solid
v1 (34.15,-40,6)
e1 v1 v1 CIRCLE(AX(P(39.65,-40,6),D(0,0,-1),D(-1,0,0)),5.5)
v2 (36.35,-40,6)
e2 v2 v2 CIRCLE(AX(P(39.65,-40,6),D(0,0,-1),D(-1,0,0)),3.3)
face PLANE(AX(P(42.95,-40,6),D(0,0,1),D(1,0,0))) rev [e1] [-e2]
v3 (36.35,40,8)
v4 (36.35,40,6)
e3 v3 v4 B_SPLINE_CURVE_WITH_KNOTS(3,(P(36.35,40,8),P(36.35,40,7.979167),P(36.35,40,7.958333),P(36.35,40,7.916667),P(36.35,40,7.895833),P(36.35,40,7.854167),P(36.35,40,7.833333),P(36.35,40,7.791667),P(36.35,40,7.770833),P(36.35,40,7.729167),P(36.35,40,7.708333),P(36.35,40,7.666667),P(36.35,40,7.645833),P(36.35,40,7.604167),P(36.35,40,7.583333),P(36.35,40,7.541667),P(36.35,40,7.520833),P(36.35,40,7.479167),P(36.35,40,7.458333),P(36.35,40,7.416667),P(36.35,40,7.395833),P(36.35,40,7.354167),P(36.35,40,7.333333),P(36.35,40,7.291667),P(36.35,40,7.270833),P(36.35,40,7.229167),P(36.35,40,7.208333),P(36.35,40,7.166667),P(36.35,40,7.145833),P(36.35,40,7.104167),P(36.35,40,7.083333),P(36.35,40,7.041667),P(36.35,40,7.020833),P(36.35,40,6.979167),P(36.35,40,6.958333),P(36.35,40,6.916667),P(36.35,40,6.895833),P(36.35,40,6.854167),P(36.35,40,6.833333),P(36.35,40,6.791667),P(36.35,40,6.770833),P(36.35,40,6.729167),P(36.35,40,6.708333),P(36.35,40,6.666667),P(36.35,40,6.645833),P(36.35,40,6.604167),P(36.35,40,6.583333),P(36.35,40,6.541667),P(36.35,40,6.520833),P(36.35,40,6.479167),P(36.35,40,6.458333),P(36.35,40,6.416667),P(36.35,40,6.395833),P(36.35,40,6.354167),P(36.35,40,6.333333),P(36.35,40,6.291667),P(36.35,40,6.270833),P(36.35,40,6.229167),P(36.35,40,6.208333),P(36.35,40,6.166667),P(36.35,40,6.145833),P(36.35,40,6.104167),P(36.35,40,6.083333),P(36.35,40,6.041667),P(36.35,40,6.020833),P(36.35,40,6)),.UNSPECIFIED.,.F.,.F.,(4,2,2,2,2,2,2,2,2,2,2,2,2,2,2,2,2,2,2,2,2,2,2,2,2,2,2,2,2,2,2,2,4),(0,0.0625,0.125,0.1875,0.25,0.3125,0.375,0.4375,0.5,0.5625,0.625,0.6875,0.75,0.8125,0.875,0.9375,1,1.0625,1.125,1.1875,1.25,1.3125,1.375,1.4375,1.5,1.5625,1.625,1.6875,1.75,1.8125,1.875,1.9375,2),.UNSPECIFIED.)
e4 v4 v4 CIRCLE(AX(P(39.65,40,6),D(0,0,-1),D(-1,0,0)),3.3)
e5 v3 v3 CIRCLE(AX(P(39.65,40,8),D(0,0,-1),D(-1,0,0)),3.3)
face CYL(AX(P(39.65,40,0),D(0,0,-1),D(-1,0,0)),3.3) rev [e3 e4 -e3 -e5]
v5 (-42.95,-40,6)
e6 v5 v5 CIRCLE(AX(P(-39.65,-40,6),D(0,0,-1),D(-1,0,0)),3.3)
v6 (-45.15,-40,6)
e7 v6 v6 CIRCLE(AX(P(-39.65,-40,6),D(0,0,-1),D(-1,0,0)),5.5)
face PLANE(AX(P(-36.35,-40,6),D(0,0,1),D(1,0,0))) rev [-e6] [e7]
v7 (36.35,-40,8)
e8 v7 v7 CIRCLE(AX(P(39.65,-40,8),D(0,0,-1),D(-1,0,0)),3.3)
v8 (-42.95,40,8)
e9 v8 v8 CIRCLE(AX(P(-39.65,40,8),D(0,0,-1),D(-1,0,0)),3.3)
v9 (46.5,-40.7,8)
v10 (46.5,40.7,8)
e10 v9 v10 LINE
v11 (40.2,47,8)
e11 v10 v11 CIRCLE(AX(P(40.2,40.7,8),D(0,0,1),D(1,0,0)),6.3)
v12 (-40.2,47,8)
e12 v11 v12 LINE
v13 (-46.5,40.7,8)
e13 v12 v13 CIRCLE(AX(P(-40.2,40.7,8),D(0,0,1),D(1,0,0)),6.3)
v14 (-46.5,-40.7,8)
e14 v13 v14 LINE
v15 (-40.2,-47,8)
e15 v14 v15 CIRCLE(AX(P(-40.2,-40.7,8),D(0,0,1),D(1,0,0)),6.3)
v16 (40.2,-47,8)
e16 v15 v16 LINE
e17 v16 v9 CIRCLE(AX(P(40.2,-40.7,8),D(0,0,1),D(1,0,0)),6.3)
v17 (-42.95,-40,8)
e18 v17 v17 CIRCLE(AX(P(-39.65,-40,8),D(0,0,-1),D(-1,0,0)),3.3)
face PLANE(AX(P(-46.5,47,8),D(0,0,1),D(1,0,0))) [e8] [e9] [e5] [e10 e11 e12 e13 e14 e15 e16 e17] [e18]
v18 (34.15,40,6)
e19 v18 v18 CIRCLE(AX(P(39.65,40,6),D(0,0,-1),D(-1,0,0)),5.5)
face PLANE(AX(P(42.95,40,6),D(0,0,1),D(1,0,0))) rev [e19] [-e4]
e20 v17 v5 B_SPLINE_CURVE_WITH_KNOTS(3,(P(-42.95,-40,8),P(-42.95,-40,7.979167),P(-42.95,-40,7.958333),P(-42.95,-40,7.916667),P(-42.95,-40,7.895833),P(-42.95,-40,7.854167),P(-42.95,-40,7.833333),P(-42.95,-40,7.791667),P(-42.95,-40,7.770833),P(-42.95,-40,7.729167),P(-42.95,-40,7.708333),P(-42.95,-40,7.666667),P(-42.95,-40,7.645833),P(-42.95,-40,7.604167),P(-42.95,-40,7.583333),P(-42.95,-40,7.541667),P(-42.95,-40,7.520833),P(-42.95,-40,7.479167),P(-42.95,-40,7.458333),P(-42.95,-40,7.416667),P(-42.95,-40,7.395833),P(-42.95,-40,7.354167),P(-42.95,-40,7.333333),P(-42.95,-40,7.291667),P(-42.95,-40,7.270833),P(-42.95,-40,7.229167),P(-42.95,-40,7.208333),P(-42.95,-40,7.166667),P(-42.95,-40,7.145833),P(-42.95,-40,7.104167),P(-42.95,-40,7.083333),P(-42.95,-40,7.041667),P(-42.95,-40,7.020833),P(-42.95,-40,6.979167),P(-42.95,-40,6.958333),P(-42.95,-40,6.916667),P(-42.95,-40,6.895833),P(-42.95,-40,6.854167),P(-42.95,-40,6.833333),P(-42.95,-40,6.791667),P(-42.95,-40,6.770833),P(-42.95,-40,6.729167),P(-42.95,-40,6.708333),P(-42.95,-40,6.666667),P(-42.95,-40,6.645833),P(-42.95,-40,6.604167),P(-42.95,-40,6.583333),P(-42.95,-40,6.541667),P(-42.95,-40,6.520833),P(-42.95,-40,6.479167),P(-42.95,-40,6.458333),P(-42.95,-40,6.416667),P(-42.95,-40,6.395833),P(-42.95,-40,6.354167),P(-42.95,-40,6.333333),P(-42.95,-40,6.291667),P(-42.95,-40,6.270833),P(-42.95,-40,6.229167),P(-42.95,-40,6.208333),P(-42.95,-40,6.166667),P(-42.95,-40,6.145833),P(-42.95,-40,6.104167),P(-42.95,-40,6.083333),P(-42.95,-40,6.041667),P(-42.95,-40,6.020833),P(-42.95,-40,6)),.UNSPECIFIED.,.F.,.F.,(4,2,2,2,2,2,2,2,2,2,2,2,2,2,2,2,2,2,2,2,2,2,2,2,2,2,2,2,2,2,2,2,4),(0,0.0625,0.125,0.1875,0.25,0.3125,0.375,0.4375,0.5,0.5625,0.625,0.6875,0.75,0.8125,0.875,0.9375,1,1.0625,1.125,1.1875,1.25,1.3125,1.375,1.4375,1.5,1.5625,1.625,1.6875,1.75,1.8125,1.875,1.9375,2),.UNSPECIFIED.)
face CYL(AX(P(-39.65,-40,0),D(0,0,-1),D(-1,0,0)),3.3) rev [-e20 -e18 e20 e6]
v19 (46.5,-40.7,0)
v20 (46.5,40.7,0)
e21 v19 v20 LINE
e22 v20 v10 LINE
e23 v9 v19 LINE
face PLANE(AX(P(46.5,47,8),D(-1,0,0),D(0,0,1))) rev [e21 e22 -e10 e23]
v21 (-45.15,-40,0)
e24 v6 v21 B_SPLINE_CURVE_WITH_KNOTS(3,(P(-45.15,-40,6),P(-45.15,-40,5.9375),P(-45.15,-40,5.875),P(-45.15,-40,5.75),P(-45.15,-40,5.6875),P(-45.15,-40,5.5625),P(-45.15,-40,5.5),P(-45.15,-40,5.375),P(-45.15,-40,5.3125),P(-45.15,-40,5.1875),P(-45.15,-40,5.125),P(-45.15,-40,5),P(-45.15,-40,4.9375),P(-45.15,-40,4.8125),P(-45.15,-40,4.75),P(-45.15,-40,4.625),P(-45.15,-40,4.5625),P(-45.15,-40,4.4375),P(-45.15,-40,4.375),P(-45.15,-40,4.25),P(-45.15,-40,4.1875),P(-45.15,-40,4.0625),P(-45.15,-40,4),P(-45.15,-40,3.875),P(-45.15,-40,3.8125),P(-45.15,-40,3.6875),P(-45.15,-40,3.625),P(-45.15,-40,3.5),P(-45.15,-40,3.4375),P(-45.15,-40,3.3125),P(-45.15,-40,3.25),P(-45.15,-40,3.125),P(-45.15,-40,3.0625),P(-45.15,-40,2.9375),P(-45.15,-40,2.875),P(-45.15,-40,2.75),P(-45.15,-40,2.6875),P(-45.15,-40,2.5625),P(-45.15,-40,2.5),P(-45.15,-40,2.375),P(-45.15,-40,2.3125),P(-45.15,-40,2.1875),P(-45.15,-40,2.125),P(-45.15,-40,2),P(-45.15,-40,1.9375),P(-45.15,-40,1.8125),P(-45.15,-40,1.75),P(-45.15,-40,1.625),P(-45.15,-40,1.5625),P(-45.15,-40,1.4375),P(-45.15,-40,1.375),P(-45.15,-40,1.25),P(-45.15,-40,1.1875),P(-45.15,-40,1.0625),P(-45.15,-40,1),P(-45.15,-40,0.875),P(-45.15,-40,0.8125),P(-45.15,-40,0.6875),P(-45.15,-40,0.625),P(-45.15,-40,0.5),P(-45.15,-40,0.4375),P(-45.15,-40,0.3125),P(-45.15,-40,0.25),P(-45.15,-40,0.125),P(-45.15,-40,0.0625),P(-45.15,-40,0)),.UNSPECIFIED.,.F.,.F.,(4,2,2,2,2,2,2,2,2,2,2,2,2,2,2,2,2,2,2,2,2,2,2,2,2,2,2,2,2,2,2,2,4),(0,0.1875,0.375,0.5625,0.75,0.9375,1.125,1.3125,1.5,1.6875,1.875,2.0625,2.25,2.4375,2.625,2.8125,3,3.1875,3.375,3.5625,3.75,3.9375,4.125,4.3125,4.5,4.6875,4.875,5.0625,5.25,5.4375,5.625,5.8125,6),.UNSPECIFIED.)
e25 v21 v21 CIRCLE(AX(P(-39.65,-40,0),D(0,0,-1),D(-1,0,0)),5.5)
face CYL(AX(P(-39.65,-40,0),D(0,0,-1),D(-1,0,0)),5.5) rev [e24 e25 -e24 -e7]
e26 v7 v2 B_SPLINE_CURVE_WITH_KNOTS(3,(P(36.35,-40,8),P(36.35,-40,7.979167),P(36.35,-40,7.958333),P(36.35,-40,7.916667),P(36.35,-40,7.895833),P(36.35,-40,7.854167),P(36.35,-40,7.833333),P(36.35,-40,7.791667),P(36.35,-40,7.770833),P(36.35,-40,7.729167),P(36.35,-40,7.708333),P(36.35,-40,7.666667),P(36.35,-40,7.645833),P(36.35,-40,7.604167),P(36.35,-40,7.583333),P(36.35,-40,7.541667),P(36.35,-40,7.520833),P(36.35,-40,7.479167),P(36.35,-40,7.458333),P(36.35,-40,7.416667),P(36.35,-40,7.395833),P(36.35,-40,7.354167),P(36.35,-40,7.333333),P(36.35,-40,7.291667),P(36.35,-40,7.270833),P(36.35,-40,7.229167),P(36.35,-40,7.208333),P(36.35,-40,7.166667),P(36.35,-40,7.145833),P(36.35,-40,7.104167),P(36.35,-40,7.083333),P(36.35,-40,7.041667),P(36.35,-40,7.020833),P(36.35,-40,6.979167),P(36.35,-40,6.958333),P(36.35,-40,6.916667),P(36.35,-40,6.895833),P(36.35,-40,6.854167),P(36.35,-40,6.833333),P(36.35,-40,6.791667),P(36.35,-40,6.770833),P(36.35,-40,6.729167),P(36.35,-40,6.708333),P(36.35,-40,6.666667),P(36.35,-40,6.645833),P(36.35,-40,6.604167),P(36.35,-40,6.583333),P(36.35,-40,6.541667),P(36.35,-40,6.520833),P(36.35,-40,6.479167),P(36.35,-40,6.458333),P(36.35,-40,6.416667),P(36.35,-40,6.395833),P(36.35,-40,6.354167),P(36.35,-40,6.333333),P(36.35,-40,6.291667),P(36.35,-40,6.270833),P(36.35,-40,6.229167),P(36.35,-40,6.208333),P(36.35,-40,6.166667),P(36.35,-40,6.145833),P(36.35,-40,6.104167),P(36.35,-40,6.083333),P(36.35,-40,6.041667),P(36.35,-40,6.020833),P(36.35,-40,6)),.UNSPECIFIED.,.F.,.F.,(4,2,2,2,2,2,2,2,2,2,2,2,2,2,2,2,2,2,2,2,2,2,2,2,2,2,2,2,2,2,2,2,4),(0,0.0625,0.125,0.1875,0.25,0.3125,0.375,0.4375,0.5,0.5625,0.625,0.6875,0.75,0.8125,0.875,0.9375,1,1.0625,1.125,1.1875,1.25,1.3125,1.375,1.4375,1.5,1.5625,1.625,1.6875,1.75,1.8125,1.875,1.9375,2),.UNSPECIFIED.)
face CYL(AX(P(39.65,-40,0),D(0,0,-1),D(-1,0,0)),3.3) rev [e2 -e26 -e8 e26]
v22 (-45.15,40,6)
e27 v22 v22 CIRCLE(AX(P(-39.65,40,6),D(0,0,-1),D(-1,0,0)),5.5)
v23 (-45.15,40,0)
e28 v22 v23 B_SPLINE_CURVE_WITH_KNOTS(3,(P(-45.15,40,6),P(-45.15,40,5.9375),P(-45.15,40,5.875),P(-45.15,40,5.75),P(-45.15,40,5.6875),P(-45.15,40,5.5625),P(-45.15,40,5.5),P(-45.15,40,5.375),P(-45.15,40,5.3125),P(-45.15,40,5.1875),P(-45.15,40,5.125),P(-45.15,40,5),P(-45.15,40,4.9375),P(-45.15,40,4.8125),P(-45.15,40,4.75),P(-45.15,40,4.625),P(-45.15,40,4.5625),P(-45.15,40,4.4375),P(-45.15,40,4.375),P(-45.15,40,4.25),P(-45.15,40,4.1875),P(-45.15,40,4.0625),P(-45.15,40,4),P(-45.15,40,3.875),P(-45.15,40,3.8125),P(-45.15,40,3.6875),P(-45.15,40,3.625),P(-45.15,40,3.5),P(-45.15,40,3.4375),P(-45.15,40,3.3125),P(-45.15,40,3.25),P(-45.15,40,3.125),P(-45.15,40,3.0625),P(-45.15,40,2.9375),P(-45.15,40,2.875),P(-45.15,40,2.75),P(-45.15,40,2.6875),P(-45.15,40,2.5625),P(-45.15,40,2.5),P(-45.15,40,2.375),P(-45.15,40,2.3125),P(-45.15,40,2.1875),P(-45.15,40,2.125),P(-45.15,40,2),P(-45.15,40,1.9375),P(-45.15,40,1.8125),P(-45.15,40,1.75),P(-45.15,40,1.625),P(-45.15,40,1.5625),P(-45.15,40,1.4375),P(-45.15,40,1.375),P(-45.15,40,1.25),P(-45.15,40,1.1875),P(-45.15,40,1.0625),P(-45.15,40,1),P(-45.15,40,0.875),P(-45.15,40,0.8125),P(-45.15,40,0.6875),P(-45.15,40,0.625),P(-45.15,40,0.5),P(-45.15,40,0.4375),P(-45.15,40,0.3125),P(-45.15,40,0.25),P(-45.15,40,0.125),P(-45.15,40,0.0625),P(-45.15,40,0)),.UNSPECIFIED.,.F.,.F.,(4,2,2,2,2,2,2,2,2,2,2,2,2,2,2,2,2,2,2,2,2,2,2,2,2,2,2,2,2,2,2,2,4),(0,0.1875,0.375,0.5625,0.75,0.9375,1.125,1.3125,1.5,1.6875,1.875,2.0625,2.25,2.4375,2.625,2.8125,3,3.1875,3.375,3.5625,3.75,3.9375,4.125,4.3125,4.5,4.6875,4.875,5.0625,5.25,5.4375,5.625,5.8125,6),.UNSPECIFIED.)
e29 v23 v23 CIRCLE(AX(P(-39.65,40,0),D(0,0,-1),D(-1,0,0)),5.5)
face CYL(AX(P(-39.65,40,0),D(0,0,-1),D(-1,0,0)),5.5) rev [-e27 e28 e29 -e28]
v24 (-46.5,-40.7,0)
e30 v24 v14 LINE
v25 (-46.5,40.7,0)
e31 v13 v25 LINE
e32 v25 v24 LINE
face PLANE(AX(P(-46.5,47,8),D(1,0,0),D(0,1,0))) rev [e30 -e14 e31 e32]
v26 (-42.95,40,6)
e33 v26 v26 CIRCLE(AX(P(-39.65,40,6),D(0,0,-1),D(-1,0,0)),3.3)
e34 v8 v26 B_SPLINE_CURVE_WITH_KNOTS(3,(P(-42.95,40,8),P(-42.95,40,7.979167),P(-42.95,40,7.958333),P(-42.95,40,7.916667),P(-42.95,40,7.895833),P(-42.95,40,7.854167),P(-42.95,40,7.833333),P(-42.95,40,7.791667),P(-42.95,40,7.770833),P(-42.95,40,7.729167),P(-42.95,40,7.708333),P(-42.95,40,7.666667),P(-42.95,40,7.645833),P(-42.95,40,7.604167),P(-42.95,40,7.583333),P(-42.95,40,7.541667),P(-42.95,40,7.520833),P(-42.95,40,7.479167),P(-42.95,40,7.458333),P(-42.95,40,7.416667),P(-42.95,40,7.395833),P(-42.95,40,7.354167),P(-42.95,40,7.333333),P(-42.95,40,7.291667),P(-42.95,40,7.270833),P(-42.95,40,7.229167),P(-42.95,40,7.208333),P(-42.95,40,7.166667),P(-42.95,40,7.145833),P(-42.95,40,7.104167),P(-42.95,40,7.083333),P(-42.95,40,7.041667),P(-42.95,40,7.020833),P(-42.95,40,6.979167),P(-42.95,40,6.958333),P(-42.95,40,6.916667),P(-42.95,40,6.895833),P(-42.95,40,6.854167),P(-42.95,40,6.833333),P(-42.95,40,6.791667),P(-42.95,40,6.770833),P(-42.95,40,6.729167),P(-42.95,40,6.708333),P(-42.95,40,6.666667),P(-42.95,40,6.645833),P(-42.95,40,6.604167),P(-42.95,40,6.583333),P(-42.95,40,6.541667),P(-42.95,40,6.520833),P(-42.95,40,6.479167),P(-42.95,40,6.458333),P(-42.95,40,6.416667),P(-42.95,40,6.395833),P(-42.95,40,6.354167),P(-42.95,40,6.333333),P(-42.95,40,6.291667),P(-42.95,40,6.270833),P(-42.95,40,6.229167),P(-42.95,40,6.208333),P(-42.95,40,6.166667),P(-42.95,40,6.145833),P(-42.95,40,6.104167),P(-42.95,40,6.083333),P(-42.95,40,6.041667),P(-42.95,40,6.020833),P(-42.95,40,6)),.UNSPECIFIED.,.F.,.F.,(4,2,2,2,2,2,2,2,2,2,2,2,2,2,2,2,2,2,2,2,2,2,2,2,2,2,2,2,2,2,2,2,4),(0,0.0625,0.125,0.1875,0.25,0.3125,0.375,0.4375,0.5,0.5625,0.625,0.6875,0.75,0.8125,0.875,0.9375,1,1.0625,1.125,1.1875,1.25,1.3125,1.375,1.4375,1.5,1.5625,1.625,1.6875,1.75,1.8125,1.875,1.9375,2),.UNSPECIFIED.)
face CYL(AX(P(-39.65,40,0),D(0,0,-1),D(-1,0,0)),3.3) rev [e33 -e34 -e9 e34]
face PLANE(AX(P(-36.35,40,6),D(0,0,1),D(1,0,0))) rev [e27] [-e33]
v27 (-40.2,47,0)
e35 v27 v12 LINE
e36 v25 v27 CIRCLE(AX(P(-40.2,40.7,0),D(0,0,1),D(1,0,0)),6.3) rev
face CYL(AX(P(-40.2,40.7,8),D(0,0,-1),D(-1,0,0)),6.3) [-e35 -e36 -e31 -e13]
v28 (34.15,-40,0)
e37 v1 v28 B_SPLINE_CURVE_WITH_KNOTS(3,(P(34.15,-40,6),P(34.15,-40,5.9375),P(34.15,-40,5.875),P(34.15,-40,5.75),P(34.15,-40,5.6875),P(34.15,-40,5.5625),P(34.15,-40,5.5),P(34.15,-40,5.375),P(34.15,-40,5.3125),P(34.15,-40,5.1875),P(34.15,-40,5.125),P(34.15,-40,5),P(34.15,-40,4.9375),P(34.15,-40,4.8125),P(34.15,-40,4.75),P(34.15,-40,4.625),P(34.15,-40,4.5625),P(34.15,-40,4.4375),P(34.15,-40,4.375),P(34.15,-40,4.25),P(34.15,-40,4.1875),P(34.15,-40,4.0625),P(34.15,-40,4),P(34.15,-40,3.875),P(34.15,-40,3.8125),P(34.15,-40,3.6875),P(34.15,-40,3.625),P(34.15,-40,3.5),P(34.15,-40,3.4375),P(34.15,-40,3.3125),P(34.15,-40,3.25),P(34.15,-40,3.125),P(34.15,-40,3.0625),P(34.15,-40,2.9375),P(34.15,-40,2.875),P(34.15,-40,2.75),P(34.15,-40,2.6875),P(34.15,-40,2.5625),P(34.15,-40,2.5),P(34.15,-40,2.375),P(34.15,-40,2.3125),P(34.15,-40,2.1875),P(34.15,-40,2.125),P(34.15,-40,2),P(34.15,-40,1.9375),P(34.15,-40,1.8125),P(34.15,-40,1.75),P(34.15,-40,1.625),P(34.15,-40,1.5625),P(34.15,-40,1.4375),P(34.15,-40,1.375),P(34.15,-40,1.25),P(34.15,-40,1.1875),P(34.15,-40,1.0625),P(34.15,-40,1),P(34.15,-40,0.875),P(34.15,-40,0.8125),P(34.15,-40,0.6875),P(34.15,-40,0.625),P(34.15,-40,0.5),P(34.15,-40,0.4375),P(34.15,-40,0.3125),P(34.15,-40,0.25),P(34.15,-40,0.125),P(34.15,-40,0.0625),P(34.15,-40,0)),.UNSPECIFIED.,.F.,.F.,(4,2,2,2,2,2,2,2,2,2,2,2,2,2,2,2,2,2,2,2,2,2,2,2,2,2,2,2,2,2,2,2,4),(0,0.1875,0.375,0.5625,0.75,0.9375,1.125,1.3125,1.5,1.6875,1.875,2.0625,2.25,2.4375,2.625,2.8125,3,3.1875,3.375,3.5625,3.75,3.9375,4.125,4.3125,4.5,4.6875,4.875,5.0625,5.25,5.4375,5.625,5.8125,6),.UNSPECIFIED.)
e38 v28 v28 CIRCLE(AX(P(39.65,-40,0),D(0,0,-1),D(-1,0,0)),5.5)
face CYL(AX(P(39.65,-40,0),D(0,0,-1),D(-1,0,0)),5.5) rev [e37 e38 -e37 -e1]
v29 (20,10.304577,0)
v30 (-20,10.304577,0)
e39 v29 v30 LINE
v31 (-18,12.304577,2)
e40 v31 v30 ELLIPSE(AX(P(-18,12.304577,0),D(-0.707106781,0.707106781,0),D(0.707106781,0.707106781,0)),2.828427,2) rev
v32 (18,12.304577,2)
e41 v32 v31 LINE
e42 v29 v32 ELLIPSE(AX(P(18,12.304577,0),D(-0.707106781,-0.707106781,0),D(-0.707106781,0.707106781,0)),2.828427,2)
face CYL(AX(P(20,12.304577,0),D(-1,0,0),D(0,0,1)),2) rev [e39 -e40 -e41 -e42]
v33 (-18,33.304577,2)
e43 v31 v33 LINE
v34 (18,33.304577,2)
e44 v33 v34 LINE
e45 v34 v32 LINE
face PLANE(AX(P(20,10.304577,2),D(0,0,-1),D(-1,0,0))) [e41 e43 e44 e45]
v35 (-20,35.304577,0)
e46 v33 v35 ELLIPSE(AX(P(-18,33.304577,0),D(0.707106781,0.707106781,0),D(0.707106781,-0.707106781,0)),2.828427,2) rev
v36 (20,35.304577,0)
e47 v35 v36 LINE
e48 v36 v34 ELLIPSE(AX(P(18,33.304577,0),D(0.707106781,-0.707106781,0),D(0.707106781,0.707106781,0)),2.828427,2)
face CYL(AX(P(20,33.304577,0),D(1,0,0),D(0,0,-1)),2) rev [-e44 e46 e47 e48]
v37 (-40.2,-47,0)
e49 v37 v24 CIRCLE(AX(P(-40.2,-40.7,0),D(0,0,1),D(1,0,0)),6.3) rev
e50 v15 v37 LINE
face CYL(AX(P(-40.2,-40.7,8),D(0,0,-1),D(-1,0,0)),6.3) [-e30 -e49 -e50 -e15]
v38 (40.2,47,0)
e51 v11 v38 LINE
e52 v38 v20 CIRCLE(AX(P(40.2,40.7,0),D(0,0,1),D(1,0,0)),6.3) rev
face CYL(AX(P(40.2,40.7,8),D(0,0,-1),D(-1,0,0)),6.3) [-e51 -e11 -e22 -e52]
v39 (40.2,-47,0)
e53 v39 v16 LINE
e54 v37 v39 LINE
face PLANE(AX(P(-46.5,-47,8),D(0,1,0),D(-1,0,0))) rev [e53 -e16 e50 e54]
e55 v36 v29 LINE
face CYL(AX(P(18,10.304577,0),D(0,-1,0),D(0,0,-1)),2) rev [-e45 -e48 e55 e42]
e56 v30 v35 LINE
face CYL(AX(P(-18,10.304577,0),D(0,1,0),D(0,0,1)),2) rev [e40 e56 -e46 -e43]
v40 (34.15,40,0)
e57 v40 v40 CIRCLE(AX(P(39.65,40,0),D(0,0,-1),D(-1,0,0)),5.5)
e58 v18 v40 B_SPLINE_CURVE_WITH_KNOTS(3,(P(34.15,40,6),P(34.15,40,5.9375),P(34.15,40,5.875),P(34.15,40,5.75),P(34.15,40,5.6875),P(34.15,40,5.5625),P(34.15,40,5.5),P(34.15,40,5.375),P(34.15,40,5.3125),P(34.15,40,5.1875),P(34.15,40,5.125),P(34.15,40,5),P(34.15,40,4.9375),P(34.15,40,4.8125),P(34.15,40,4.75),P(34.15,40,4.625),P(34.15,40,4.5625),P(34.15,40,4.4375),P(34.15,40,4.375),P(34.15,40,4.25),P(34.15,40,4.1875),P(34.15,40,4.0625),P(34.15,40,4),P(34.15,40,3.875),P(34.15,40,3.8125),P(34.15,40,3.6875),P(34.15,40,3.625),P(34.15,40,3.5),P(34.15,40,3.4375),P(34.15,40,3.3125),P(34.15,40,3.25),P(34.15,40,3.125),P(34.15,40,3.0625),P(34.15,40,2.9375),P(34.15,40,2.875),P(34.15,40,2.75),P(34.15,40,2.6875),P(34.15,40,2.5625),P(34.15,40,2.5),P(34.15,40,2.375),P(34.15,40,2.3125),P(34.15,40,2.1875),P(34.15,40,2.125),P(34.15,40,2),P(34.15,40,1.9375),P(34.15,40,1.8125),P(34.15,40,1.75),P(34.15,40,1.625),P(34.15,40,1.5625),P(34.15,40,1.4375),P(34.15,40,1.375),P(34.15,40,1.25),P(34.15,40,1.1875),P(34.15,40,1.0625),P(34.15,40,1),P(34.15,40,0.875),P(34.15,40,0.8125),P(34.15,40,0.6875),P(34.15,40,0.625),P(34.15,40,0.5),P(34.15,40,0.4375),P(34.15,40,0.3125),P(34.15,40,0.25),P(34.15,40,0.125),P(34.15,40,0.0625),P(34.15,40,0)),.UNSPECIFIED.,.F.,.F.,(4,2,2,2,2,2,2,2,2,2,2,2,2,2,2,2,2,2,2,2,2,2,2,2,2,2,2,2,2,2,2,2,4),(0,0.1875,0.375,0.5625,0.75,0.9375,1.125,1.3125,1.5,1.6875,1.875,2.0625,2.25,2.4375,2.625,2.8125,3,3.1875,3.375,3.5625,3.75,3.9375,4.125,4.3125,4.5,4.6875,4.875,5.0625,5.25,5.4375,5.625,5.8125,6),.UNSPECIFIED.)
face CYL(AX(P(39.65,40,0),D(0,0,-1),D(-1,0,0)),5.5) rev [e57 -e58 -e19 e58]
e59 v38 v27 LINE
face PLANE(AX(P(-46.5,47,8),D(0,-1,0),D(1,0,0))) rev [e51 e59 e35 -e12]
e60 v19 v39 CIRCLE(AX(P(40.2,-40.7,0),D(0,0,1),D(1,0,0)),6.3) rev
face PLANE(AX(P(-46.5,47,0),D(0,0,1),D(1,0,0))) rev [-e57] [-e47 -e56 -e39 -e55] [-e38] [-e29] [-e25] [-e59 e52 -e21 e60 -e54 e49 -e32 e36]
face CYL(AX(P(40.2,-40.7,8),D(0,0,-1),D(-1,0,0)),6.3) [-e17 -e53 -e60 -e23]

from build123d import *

# Parameters (mm, degrees)
ESQUISSE1_W                                        = 93
ESQUISSE1_H                                        = 94
EXTRUSION1_DEPTH                                   = 8
CONG_1_R                                           = 6.3
CHAMBRAGE_POUR_VIS_T_TE_HEXAGONALE_M61_D           = 6.6
CHAMBRAGE_POUR_VIS_T_TE_HEXAGONALE_M61_CBORE_D     = 11
CHAMBRAGE_POUR_VIS_T_TE_HEXAGONALE_M61_CBORE_DEPTH = 6
ESQUISSE10_W                                       = 40
ESQUISSE10_H                                       = 25
ENL_V_MAT_EXTRU_1_DEPTH                            = 2
CONG_2_R                                           = 2


with BuildPart() as part:
    # Esquisse1 → Extrusion1 (new body)
    with BuildSketch(Plane.XY):
        Rectangle(ESQUISSE1_W, ESQUISSE1_H)
    extrude(amount=EXTRUSION1_DEPTH)

    # Congé1
    cong_1_edges = [part.edges().sort_by_distance(p)[0] for p in [
        (-46.5, 47, 4),
        (46.5, 47, 4),
        (46.5, -47, 4),
        (-46.5, -47, 4),
    ]]
    fillet(cong_1_edges, radius=CONG_1_R)

    # Chambrage pour vis à tête hexagonale M61 (through all)
    with Locations(Plane(origin=(0, 0, 0), x_dir=(-1, 0, 0), z_dir=(0, 0, -1))):
        with Locations((39.65, -40), (39.65, 40), (-39.65, 40), (-39.65, -40)):
            CounterBoreHole(CHAMBRAGE_POUR_VIS_T_TE_HEXAGONALE_M61_D / 2, CHAMBRAGE_POUR_VIS_T_TE_HEXAGONALE_M61_CBORE_D / 2, CHAMBRAGE_POUR_VIS_T_TE_HEXAGONALE_M61_CBORE_DEPTH)

    # Esquisse10 → Enlèv. mat.-Extru.1 (cut)
    with BuildSketch(Plane(origin=(0, 0, 0), x_dir=(-1, 0, 0), z_dir=(0, 0, -1))):
        with Locations((0, 22.804576525)):
            Rectangle(ESQUISSE10_W, ESQUISSE10_H)
    extrude(amount=-ENL_V_MAT_EXTRU_1_DEPTH, mode=Mode.SUBTRACT)

    # Congé2
    cong_2_edges = [part.edges().sort_by_distance(p)[0] for p in [
        (0, 35.304576525, 2),
        (-20, 22.804576525, 2),
        (0, 10.304576525, 2),
        (20, 22.804576525, 2),
    ]]
    fillet(cong_2_edges, radius=CONG_2_R - 0.0001)  # a hair under: the kernel refuses the full size


solid = part.part
